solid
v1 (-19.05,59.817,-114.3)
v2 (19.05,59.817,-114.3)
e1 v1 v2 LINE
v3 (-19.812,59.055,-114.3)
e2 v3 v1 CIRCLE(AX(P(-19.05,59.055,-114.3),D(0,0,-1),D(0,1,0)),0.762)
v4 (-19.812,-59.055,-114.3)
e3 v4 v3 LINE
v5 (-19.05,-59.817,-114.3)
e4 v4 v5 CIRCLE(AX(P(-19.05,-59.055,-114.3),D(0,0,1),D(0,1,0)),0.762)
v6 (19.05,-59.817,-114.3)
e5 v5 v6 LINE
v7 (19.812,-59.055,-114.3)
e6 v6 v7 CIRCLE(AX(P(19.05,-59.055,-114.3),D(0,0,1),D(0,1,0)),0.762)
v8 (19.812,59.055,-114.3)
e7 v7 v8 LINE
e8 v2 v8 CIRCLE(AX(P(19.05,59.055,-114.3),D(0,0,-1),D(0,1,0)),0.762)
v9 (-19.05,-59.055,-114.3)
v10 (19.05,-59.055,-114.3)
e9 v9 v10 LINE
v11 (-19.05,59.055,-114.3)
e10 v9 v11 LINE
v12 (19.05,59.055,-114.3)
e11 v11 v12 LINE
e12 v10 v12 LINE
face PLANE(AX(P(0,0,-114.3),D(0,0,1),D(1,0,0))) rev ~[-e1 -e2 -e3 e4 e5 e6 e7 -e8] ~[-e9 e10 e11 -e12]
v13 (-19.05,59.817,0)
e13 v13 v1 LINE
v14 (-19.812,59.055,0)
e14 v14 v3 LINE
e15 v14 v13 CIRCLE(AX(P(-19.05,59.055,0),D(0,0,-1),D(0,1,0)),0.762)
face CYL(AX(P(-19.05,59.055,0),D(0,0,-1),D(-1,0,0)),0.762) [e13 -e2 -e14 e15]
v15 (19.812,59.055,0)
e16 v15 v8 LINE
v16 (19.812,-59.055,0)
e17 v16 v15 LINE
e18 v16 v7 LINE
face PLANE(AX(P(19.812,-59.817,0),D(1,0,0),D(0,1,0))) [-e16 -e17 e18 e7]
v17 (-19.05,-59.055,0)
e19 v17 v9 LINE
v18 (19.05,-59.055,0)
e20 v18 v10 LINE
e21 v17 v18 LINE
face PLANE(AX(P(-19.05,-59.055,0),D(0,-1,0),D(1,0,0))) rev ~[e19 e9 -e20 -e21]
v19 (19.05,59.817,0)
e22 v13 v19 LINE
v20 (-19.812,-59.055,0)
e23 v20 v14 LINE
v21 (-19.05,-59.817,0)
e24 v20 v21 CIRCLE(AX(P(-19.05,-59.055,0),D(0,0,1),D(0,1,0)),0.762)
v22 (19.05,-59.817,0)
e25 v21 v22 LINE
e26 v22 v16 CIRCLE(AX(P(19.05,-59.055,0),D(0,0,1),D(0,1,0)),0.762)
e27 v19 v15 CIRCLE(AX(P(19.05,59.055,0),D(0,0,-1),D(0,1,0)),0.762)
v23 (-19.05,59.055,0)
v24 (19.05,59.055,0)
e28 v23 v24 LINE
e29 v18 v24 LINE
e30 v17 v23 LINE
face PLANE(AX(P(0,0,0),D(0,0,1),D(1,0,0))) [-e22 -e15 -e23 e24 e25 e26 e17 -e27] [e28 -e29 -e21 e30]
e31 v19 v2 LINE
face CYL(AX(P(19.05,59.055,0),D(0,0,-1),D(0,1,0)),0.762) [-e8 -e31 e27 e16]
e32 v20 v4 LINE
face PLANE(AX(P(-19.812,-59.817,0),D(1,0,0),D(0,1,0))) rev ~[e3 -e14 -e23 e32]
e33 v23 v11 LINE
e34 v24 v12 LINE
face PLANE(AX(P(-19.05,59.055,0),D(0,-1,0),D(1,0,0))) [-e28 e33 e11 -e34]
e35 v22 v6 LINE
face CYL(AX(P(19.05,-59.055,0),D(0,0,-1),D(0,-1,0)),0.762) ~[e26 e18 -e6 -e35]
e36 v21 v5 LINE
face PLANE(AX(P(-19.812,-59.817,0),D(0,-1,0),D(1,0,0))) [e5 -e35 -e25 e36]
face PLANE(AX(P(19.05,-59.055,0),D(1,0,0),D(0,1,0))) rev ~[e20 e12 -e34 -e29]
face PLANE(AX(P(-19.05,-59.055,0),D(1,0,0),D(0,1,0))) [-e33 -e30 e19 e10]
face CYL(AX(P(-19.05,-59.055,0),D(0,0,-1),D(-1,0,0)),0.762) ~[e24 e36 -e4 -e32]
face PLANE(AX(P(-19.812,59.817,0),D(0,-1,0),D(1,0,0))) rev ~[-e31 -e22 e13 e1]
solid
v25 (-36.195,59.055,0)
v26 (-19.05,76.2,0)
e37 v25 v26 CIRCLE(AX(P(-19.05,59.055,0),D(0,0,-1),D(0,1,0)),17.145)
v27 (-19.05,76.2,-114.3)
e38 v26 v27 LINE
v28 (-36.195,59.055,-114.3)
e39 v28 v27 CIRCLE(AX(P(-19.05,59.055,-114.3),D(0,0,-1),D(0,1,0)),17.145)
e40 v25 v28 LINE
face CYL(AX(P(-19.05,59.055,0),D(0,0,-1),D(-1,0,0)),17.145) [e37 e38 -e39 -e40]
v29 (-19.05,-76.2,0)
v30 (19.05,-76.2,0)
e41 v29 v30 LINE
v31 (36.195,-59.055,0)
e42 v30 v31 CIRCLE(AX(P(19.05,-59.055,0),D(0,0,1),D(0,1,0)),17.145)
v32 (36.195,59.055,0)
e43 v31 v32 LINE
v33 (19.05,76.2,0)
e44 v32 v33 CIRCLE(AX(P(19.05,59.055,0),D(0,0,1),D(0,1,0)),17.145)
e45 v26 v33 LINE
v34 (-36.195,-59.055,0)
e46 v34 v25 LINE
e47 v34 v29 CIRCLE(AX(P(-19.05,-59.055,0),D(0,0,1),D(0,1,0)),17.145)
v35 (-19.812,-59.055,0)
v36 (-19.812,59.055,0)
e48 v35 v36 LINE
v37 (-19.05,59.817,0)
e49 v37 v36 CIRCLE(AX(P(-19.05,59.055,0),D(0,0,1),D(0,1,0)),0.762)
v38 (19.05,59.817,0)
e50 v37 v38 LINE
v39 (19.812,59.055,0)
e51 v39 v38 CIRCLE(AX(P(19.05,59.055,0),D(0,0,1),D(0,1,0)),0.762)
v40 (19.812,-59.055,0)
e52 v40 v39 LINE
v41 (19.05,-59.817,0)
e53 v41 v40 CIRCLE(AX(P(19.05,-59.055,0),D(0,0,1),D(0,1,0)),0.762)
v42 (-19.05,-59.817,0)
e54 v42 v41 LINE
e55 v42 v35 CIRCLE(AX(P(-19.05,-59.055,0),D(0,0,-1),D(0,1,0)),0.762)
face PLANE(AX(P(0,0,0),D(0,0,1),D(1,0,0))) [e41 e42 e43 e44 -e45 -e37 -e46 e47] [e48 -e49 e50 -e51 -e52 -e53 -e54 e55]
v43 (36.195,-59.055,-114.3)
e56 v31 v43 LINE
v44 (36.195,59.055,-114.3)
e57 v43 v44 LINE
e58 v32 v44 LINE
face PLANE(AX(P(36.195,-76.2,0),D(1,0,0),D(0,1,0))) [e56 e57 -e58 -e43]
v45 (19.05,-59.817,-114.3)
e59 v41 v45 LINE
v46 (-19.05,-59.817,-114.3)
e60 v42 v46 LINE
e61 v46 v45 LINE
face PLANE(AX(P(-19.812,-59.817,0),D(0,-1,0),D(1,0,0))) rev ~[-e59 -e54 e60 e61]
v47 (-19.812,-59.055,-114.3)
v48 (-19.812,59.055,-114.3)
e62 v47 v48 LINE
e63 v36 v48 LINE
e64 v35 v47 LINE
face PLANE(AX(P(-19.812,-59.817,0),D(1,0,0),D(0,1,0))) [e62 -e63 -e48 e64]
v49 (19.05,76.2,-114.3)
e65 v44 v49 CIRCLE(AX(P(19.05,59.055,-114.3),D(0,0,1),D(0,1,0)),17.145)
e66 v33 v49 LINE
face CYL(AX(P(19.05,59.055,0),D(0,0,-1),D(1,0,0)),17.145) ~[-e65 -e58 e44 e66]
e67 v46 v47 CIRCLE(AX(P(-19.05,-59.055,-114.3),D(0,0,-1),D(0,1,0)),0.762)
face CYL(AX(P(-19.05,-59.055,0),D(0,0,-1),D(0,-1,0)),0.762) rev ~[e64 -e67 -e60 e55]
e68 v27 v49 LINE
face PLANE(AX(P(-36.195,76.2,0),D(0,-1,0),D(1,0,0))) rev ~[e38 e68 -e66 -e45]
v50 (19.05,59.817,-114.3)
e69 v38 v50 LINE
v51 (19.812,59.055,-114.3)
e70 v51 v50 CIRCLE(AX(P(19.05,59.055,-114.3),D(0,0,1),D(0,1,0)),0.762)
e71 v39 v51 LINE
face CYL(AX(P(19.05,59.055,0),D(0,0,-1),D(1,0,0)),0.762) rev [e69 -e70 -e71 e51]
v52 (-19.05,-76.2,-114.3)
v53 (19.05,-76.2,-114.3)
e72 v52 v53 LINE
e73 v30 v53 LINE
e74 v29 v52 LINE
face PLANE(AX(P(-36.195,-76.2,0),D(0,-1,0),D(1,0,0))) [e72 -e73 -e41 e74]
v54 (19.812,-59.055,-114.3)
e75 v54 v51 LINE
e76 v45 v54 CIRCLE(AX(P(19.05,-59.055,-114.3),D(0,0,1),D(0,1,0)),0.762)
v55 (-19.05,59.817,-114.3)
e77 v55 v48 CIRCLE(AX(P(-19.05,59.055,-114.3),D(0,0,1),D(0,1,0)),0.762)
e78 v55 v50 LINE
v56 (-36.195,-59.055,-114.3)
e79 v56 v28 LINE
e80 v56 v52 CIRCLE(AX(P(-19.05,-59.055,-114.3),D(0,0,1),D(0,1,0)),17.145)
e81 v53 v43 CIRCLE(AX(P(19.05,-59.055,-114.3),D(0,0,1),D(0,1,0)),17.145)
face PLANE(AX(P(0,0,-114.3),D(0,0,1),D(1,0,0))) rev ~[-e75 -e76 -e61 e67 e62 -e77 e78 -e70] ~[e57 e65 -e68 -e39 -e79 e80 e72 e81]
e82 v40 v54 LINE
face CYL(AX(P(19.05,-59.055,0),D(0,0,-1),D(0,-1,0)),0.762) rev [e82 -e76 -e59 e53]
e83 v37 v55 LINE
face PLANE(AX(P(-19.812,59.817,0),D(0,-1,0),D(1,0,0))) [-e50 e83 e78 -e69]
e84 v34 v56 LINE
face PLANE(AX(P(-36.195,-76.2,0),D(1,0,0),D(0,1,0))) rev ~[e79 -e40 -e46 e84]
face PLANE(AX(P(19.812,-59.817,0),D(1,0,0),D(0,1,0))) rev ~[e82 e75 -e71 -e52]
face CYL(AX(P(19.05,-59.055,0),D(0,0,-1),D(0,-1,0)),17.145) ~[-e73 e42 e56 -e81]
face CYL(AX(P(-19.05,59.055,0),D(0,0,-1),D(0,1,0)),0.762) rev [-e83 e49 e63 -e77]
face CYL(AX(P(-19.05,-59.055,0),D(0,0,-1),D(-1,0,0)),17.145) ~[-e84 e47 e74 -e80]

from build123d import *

# Parameters (mm, degrees)
F4_W      = 72.39
F4_H      = 152.4
F5_DEPTH  = 114.3
F6_R      = 17.145
F7_W      = 39.624
F7_H      = 119.634
F8_DEPTH  = 114.3
F9_W      = 39.624
F9_H      = 119.634
F10_DEPTH = 114.3
F11_W     = 38.1
F11_H     = 118.11
F12_DEPTH = 114.3
F13_R     = 0.762
F14_R     = 0.762


with BuildPart() as f5:
    # F4 (on Top) → F5 (new body)
    with BuildSketch(Plane.XY):
        Rectangle(F4_W, F4_H)
    extrude(amount=-F5_DEPTH)

    # F6
    f6_edges = [f5.edges().sort_by_distance(p)[0] for p in [
        (-36.195, 76.2, -57.15),
        (36.195, 76.2, -57.15),
        (36.195, -76.2, -57.15),
        (-36.195, -76.2, -57.15),
    ]]
    fillet(f6_edges, radius=F6_R)

    # F7 (on face) → F8 (cut)
    with BuildSketch(Plane.XY):
        Rectangle(F7_W, F7_H)
    extrude(amount=-F8_DEPTH, mode=Mode.SUBTRACT)

    # F14
    f14_edges = [f5.edges().sort_by_distance(p)[0] for p in [
        (-19.812, 59.817, -57.15),
        (-19.812, -59.817, -57.15),
        (19.812, -59.817, -57.15),
        (19.812, 59.817, -57.15),
    ]]
    fillet(f14_edges, radius=F14_R)


with BuildPart() as f10:
    # F9 (on face) → F10 (new body)
    with BuildSketch(Plane.XY):
        Rectangle(F9_W, F9_H)
    extrude(amount=-F10_DEPTH)

    # F11 (on face) → F12 (cut)
    with BuildSketch(Plane.XY):
        Rectangle(F11_W, F11_H)
    extrude(amount=-F12_DEPTH, mode=Mode.SUBTRACT)

    # F13
    f13_edges = [f10.edges().sort_by_distance(p)[0] for p in [
        (-19.812, 59.817, -57.15),
        (19.812, 59.817, -57.15),
        (19.812, -59.817, -57.15),
        (-19.812, -59.817, -57.15),
    ]]
    fillet(f13_edges, radius=F13_R)


solid = Compound([f5.part, f10.part])
